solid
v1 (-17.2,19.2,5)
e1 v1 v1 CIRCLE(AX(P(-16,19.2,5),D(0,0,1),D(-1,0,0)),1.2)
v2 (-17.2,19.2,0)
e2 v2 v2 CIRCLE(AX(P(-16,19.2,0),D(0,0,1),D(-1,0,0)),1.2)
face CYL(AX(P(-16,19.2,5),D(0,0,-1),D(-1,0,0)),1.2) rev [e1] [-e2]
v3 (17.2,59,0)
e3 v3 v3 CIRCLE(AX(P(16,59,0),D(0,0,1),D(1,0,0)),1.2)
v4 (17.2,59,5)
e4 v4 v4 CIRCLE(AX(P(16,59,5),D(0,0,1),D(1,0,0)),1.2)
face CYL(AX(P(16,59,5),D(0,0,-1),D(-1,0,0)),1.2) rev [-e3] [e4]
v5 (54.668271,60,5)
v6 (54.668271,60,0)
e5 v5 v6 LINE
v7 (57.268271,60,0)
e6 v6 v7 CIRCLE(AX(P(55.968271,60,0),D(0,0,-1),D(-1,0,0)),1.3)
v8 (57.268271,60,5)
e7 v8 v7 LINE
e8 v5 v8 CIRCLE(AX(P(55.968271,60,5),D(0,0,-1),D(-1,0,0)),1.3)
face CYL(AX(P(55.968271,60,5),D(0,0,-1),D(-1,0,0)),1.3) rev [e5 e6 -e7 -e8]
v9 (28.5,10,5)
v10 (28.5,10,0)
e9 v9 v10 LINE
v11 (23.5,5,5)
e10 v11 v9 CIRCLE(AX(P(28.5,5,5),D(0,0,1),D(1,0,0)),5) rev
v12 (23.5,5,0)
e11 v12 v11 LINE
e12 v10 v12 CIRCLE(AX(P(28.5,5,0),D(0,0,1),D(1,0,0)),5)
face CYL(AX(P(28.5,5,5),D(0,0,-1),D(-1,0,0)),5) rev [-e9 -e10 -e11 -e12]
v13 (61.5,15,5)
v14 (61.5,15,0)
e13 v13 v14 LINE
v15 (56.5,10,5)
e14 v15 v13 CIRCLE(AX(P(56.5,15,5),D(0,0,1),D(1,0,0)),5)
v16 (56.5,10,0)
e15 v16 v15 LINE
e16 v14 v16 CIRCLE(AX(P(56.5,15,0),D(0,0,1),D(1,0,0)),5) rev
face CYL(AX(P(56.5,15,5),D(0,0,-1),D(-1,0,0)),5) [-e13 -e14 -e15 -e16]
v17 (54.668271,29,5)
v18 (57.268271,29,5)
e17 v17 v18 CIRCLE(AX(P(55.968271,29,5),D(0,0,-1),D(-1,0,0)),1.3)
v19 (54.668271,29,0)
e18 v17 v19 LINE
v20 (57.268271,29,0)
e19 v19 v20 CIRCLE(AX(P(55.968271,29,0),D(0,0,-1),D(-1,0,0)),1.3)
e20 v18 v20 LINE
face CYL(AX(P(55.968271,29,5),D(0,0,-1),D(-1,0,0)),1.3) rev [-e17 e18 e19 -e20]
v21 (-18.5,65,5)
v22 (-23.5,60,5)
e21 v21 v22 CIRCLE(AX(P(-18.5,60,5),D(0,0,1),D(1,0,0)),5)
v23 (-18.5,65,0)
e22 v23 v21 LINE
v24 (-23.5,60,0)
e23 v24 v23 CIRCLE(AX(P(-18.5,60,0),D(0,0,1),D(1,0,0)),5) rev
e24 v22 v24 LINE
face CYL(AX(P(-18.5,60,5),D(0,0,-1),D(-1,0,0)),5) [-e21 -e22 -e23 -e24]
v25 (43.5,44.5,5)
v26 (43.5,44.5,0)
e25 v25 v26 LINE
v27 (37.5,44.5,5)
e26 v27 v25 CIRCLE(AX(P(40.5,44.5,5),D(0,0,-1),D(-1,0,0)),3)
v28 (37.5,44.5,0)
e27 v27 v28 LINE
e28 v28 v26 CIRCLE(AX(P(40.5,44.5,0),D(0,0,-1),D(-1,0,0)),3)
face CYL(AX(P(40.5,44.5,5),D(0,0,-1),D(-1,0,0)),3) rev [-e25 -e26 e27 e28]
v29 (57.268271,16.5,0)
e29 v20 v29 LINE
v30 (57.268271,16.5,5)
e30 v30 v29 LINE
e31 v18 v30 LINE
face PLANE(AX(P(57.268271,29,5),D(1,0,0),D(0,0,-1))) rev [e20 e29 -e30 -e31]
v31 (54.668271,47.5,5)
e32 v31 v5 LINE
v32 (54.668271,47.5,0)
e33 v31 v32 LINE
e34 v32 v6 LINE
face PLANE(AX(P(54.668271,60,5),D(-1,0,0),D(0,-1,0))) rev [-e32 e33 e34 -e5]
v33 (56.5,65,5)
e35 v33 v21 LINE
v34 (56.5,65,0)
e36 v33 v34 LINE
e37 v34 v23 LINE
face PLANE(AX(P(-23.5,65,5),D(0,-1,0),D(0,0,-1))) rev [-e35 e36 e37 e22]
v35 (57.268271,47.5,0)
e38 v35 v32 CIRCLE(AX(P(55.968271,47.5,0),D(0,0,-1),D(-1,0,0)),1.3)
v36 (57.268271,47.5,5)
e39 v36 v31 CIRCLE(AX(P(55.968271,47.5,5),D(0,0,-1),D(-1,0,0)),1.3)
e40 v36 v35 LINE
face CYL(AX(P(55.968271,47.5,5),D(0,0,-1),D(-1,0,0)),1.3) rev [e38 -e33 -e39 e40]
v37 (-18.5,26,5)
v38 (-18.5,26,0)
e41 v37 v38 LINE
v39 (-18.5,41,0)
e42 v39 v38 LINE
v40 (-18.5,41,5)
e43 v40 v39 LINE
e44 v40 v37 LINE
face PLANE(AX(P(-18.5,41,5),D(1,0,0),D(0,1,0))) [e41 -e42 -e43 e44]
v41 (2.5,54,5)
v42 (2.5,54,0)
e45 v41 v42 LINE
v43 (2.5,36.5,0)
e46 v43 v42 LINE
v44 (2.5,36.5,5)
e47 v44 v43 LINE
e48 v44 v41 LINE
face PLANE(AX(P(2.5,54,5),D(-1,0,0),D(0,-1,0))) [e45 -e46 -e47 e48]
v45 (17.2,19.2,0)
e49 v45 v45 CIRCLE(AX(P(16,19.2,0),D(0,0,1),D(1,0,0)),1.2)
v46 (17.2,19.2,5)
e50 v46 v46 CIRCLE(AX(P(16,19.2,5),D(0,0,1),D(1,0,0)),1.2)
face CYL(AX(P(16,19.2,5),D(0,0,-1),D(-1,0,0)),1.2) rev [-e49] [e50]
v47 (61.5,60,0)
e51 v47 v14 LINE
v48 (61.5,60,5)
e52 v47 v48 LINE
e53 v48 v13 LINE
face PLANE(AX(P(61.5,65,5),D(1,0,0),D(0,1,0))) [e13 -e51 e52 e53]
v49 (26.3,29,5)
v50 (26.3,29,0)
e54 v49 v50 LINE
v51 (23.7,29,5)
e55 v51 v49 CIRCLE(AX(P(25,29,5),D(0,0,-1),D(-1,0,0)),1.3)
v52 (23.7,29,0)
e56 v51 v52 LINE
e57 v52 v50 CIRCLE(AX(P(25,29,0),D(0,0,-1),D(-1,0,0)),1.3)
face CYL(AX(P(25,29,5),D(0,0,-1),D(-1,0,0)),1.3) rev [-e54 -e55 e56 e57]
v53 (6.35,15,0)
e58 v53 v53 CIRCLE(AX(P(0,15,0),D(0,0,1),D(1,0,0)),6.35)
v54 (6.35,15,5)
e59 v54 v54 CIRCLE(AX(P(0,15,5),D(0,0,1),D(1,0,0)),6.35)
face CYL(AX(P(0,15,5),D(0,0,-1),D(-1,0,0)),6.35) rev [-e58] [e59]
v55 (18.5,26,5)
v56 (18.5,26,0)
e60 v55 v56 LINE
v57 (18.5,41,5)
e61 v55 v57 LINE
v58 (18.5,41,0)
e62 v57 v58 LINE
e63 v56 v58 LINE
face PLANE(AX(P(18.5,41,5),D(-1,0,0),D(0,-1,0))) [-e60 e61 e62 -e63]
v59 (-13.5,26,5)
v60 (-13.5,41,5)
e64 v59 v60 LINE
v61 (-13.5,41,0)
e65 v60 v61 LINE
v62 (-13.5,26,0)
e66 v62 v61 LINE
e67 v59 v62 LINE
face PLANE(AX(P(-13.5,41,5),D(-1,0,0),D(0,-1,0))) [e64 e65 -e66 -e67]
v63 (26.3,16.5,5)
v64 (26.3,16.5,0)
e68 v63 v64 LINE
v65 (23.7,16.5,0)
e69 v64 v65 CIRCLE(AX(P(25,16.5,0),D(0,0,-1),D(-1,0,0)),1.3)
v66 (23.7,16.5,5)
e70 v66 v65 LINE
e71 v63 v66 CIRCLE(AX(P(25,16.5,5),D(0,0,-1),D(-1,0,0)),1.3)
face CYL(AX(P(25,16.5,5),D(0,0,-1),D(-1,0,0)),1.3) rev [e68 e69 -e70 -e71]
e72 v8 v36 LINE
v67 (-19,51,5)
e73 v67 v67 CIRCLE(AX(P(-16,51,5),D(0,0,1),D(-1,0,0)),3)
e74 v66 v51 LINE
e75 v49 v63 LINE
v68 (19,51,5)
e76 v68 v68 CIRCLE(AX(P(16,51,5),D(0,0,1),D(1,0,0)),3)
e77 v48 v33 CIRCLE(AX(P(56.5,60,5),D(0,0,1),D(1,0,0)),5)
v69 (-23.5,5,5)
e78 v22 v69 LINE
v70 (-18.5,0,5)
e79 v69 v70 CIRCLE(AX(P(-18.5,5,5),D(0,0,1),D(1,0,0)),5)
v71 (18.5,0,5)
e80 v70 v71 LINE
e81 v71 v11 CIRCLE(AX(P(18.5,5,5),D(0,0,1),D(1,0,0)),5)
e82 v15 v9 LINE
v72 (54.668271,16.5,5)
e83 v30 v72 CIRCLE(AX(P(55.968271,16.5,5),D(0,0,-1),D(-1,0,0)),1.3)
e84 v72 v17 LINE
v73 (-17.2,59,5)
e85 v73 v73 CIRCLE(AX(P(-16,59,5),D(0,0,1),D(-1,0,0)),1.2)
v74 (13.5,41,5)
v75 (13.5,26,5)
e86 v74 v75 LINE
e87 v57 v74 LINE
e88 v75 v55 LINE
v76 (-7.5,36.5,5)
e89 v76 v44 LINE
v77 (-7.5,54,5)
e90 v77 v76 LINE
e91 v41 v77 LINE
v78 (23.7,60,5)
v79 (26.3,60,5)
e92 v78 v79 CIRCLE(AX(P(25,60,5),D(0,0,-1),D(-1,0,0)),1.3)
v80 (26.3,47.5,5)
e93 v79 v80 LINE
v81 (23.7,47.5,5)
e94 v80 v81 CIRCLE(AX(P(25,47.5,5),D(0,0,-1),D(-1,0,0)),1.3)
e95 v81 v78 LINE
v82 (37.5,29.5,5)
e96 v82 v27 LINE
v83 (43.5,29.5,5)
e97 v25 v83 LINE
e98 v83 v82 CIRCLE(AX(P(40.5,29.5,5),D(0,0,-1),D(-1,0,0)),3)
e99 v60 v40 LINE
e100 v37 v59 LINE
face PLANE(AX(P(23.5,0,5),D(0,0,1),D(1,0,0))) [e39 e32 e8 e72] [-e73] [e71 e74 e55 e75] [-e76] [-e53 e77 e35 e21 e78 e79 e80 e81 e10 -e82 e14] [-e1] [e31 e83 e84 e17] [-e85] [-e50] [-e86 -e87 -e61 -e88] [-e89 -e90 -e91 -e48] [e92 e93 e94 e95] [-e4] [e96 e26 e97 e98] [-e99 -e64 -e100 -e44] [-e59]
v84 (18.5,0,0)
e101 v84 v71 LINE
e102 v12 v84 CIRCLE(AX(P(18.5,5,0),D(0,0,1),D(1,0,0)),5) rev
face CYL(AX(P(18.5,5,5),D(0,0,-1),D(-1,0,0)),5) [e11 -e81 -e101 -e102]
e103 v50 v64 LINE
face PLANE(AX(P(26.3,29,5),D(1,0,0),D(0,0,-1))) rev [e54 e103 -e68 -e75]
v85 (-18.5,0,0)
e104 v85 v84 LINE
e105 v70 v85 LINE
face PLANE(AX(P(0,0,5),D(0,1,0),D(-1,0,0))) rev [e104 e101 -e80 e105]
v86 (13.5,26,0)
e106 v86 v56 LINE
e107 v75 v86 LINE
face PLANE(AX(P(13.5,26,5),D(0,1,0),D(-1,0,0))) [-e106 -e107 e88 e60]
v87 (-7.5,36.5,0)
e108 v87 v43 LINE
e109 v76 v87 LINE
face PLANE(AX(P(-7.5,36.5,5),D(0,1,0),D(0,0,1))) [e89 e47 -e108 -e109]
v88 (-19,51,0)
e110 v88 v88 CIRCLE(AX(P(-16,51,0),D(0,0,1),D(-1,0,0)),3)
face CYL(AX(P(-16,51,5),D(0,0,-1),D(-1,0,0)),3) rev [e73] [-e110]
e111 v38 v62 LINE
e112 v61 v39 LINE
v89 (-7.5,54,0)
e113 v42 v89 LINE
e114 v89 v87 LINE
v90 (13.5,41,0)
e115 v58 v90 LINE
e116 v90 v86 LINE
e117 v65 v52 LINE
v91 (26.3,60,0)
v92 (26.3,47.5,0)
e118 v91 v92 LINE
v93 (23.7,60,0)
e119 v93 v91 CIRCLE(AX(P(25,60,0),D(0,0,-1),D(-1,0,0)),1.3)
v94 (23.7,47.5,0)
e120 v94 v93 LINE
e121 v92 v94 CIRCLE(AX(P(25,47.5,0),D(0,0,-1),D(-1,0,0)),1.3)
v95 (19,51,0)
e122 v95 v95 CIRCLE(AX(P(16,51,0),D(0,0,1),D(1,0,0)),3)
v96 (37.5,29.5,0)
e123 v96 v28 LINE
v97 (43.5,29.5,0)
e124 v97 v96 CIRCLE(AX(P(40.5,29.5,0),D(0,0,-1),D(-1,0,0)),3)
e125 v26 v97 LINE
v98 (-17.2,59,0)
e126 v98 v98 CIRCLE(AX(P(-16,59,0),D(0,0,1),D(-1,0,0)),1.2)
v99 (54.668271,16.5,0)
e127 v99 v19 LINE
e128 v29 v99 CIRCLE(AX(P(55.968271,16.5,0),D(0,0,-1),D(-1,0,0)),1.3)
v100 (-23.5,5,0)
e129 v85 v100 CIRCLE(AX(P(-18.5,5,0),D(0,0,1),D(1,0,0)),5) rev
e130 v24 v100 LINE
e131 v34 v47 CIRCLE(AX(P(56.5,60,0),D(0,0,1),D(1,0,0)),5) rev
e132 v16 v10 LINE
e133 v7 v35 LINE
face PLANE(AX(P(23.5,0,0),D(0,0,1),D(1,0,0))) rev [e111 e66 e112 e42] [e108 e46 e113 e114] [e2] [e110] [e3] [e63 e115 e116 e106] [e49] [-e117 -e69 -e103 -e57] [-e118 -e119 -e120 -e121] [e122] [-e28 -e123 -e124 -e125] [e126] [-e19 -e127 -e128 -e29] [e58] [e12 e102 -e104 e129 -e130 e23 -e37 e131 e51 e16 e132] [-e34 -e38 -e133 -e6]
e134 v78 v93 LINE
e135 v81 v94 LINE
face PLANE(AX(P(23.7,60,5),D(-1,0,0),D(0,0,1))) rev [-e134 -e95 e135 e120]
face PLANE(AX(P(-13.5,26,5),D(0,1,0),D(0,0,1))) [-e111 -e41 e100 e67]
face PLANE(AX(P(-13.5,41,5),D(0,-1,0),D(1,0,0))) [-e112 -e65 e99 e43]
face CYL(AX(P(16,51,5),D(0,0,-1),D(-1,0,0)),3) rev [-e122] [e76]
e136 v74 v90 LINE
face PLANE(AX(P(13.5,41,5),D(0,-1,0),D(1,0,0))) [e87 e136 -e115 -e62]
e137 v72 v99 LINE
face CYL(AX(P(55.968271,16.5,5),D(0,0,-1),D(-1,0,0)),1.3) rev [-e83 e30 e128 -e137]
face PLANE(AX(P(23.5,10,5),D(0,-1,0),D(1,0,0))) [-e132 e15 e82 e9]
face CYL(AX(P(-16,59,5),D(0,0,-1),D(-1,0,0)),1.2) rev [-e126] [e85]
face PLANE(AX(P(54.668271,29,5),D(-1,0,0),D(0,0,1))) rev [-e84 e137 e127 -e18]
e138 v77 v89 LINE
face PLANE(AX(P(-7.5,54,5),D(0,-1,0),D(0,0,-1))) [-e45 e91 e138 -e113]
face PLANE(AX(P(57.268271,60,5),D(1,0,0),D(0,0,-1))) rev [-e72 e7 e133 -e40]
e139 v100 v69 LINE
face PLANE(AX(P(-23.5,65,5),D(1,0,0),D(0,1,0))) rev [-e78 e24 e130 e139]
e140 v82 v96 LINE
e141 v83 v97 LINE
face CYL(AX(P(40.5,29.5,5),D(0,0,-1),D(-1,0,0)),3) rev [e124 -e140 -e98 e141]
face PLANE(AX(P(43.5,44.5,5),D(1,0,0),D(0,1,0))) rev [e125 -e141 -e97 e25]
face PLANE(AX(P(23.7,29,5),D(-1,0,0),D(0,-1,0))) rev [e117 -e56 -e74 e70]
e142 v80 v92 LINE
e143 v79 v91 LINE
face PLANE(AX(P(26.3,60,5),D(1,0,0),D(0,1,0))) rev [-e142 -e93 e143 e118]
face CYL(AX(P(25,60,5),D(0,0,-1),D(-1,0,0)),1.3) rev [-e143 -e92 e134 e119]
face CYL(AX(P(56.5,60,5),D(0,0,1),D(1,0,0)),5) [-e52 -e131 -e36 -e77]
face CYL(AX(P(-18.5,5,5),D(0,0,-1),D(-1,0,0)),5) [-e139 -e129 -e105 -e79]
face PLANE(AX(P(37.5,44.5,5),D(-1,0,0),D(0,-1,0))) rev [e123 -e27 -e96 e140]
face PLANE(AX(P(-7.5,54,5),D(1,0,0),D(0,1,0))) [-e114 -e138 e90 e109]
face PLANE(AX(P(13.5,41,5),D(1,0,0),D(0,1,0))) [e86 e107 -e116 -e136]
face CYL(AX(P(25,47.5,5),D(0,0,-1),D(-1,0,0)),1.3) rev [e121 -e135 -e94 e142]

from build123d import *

# Parameters (mm, degrees)
SKETCH1_R           = 3
SKETCH1_R_2         = 1.2
SKETCH1_R_3         = 6.35
SKETCH1_W           = 5
SKETCH1_H           = 15
SKETCH1_W_2         = 10
SKETCH1_H_2         = 17.5
BOSS_EXTRUDE1_DEPTH = 5
SKETCH2_W           = 38
SKETCH2_H           = 55
BOSS_EXTRUDE2_DEPTH = 5
FILLET1_R           = 5


with BuildPart() as part:
    # Sketch1 → Boss-Extrude1 (new body)
    with BuildSketch(Plane.XY):
        Polygon((-23.5, 65), (23.5, 65), (23.5, 0), (0, 0), (-23.5, 0), align=None)
        with Locations((16, 51)):
            Circle(SKETCH1_R, mode=Mode.SUBTRACT)
        with Locations((16, 19.2)):
            Circle(SKETCH1_R_2, mode=Mode.SUBTRACT)
        with Locations((16, 59)):
            Circle(SKETCH1_R_2, mode=Mode.SUBTRACT)
        with Locations(Location((-16, 59, 0), (0, 0, 180))):
            Circle(SKETCH1_R_2, mode=Mode.SUBTRACT)
        with Locations(Location((-16, 19.2, 0), (0, 0, 180))):
            Circle(SKETCH1_R_2, mode=Mode.SUBTRACT)
        with Locations(Location((-16, 51, 0), (0, 0, 180))):
            Circle(SKETCH1_R, mode=Mode.SUBTRACT)
        with Locations((0, 15)):
            Circle(SKETCH1_R_3, mode=Mode.SUBTRACT)
        with Locations((16, 33.5)):
            Rectangle(SKETCH1_W, SKETCH1_H, mode=Mode.SUBTRACT)
        with Locations((-2.5, 45.25)):
            Rectangle(SKETCH1_W_2, SKETCH1_H_2, mode=Mode.SUBTRACT)
        with Locations((-16, 33.5)):
            Rectangle(SKETCH1_W, SKETCH1_H, mode=Mode.SUBTRACT)
    extrude(amount=BOSS_EXTRUDE1_DEPTH)

    # Sketch2 → Boss-Extrude2 (add)
    with BuildSketch(Plane(origin=(0, 0, 0), x_dir=(-1, 0, 0), z_dir=(0, 0, -1))):
        with Locations((-42.5, 37.5)):
            Rectangle(SKETCH2_W, SKETCH2_H)
        with BuildLine():
            Line((-37.5, 44.5), (-37.5, 29.5))
            ThreePointArc((-37.5, 29.5), (-40.5, 26.5), (-43.5, 29.5))
            Line((-43.5, 29.5), (-43.5, 44.5))
            ThreePointArc((-43.5, 44.5), (-40.5, 47.5), (-37.5, 44.5))
        make_face(mode=Mode.SUBTRACT)
        with BuildLine():
            Line((-23.7, 60), (-23.7, 47.5))
            ThreePointArc((-23.7, 47.5), (-25, 46.2), (-26.3, 47.5))
            Line((-26.3, 47.5), (-26.3, 60))
            ThreePointArc((-26.3, 60), (-25, 61.3), (-23.7, 60))
        make_face(mode=Mode.SUBTRACT)
        with BuildLine():
            Line((-54.668271165, 60), (-54.668271165, 47.5))
            ThreePointArc((-54.668271165, 47.5), (-55.968271165, 46.2), (-57.268271165, 47.5))
            Line((-57.268271165, 47.5), (-57.268271165, 60))
            ThreePointArc((-57.268271165, 60), (-55.968271165, 61.3), (-54.668271165, 60))
        make_face(mode=Mode.SUBTRACT)
        with BuildLine():
            Line((-23.7, 29), (-23.7, 16.5))
            ThreePointArc((-23.7, 16.5), (-25, 15.2), (-26.3, 16.5))
            Line((-26.3, 16.5), (-26.3, 29))
            ThreePointArc((-26.3, 29), (-25, 30.3), (-23.7, 29))
        make_face(mode=Mode.SUBTRACT)
        with BuildLine():
            Line((-54.668271165, 29), (-54.668271165, 16.5))
            ThreePointArc((-54.668271165, 16.5), (-55.968271165, 15.2), (-57.268271165, 16.5))
            Line((-57.268271165, 16.5), (-57.268271165, 29))
            ThreePointArc((-57.268271165, 29), (-55.968271165, 30.3), (-54.668271165, 29))
        make_face(mode=Mode.SUBTRACT)
    extrude(amount=-BOSS_EXTRUDE2_DEPTH)

    # Fillet1
    fillet1_edges = [part.edges().sort_by_distance(p)[0] for p in [
        (23.5, 0, 2.5),
        (-23.5, 0, 2.5),
        (-23.5, 65, 2.5),
        (23.5, 10, 2.5),
        (61.5, 10, 2.5),
        (61.5, 65, 2.5),
    ]]
    fillet(fillet1_edges, radius=FILLET1_R - 0.0001)  # a hair under: the kernel refuses the full size


solid = part.part
